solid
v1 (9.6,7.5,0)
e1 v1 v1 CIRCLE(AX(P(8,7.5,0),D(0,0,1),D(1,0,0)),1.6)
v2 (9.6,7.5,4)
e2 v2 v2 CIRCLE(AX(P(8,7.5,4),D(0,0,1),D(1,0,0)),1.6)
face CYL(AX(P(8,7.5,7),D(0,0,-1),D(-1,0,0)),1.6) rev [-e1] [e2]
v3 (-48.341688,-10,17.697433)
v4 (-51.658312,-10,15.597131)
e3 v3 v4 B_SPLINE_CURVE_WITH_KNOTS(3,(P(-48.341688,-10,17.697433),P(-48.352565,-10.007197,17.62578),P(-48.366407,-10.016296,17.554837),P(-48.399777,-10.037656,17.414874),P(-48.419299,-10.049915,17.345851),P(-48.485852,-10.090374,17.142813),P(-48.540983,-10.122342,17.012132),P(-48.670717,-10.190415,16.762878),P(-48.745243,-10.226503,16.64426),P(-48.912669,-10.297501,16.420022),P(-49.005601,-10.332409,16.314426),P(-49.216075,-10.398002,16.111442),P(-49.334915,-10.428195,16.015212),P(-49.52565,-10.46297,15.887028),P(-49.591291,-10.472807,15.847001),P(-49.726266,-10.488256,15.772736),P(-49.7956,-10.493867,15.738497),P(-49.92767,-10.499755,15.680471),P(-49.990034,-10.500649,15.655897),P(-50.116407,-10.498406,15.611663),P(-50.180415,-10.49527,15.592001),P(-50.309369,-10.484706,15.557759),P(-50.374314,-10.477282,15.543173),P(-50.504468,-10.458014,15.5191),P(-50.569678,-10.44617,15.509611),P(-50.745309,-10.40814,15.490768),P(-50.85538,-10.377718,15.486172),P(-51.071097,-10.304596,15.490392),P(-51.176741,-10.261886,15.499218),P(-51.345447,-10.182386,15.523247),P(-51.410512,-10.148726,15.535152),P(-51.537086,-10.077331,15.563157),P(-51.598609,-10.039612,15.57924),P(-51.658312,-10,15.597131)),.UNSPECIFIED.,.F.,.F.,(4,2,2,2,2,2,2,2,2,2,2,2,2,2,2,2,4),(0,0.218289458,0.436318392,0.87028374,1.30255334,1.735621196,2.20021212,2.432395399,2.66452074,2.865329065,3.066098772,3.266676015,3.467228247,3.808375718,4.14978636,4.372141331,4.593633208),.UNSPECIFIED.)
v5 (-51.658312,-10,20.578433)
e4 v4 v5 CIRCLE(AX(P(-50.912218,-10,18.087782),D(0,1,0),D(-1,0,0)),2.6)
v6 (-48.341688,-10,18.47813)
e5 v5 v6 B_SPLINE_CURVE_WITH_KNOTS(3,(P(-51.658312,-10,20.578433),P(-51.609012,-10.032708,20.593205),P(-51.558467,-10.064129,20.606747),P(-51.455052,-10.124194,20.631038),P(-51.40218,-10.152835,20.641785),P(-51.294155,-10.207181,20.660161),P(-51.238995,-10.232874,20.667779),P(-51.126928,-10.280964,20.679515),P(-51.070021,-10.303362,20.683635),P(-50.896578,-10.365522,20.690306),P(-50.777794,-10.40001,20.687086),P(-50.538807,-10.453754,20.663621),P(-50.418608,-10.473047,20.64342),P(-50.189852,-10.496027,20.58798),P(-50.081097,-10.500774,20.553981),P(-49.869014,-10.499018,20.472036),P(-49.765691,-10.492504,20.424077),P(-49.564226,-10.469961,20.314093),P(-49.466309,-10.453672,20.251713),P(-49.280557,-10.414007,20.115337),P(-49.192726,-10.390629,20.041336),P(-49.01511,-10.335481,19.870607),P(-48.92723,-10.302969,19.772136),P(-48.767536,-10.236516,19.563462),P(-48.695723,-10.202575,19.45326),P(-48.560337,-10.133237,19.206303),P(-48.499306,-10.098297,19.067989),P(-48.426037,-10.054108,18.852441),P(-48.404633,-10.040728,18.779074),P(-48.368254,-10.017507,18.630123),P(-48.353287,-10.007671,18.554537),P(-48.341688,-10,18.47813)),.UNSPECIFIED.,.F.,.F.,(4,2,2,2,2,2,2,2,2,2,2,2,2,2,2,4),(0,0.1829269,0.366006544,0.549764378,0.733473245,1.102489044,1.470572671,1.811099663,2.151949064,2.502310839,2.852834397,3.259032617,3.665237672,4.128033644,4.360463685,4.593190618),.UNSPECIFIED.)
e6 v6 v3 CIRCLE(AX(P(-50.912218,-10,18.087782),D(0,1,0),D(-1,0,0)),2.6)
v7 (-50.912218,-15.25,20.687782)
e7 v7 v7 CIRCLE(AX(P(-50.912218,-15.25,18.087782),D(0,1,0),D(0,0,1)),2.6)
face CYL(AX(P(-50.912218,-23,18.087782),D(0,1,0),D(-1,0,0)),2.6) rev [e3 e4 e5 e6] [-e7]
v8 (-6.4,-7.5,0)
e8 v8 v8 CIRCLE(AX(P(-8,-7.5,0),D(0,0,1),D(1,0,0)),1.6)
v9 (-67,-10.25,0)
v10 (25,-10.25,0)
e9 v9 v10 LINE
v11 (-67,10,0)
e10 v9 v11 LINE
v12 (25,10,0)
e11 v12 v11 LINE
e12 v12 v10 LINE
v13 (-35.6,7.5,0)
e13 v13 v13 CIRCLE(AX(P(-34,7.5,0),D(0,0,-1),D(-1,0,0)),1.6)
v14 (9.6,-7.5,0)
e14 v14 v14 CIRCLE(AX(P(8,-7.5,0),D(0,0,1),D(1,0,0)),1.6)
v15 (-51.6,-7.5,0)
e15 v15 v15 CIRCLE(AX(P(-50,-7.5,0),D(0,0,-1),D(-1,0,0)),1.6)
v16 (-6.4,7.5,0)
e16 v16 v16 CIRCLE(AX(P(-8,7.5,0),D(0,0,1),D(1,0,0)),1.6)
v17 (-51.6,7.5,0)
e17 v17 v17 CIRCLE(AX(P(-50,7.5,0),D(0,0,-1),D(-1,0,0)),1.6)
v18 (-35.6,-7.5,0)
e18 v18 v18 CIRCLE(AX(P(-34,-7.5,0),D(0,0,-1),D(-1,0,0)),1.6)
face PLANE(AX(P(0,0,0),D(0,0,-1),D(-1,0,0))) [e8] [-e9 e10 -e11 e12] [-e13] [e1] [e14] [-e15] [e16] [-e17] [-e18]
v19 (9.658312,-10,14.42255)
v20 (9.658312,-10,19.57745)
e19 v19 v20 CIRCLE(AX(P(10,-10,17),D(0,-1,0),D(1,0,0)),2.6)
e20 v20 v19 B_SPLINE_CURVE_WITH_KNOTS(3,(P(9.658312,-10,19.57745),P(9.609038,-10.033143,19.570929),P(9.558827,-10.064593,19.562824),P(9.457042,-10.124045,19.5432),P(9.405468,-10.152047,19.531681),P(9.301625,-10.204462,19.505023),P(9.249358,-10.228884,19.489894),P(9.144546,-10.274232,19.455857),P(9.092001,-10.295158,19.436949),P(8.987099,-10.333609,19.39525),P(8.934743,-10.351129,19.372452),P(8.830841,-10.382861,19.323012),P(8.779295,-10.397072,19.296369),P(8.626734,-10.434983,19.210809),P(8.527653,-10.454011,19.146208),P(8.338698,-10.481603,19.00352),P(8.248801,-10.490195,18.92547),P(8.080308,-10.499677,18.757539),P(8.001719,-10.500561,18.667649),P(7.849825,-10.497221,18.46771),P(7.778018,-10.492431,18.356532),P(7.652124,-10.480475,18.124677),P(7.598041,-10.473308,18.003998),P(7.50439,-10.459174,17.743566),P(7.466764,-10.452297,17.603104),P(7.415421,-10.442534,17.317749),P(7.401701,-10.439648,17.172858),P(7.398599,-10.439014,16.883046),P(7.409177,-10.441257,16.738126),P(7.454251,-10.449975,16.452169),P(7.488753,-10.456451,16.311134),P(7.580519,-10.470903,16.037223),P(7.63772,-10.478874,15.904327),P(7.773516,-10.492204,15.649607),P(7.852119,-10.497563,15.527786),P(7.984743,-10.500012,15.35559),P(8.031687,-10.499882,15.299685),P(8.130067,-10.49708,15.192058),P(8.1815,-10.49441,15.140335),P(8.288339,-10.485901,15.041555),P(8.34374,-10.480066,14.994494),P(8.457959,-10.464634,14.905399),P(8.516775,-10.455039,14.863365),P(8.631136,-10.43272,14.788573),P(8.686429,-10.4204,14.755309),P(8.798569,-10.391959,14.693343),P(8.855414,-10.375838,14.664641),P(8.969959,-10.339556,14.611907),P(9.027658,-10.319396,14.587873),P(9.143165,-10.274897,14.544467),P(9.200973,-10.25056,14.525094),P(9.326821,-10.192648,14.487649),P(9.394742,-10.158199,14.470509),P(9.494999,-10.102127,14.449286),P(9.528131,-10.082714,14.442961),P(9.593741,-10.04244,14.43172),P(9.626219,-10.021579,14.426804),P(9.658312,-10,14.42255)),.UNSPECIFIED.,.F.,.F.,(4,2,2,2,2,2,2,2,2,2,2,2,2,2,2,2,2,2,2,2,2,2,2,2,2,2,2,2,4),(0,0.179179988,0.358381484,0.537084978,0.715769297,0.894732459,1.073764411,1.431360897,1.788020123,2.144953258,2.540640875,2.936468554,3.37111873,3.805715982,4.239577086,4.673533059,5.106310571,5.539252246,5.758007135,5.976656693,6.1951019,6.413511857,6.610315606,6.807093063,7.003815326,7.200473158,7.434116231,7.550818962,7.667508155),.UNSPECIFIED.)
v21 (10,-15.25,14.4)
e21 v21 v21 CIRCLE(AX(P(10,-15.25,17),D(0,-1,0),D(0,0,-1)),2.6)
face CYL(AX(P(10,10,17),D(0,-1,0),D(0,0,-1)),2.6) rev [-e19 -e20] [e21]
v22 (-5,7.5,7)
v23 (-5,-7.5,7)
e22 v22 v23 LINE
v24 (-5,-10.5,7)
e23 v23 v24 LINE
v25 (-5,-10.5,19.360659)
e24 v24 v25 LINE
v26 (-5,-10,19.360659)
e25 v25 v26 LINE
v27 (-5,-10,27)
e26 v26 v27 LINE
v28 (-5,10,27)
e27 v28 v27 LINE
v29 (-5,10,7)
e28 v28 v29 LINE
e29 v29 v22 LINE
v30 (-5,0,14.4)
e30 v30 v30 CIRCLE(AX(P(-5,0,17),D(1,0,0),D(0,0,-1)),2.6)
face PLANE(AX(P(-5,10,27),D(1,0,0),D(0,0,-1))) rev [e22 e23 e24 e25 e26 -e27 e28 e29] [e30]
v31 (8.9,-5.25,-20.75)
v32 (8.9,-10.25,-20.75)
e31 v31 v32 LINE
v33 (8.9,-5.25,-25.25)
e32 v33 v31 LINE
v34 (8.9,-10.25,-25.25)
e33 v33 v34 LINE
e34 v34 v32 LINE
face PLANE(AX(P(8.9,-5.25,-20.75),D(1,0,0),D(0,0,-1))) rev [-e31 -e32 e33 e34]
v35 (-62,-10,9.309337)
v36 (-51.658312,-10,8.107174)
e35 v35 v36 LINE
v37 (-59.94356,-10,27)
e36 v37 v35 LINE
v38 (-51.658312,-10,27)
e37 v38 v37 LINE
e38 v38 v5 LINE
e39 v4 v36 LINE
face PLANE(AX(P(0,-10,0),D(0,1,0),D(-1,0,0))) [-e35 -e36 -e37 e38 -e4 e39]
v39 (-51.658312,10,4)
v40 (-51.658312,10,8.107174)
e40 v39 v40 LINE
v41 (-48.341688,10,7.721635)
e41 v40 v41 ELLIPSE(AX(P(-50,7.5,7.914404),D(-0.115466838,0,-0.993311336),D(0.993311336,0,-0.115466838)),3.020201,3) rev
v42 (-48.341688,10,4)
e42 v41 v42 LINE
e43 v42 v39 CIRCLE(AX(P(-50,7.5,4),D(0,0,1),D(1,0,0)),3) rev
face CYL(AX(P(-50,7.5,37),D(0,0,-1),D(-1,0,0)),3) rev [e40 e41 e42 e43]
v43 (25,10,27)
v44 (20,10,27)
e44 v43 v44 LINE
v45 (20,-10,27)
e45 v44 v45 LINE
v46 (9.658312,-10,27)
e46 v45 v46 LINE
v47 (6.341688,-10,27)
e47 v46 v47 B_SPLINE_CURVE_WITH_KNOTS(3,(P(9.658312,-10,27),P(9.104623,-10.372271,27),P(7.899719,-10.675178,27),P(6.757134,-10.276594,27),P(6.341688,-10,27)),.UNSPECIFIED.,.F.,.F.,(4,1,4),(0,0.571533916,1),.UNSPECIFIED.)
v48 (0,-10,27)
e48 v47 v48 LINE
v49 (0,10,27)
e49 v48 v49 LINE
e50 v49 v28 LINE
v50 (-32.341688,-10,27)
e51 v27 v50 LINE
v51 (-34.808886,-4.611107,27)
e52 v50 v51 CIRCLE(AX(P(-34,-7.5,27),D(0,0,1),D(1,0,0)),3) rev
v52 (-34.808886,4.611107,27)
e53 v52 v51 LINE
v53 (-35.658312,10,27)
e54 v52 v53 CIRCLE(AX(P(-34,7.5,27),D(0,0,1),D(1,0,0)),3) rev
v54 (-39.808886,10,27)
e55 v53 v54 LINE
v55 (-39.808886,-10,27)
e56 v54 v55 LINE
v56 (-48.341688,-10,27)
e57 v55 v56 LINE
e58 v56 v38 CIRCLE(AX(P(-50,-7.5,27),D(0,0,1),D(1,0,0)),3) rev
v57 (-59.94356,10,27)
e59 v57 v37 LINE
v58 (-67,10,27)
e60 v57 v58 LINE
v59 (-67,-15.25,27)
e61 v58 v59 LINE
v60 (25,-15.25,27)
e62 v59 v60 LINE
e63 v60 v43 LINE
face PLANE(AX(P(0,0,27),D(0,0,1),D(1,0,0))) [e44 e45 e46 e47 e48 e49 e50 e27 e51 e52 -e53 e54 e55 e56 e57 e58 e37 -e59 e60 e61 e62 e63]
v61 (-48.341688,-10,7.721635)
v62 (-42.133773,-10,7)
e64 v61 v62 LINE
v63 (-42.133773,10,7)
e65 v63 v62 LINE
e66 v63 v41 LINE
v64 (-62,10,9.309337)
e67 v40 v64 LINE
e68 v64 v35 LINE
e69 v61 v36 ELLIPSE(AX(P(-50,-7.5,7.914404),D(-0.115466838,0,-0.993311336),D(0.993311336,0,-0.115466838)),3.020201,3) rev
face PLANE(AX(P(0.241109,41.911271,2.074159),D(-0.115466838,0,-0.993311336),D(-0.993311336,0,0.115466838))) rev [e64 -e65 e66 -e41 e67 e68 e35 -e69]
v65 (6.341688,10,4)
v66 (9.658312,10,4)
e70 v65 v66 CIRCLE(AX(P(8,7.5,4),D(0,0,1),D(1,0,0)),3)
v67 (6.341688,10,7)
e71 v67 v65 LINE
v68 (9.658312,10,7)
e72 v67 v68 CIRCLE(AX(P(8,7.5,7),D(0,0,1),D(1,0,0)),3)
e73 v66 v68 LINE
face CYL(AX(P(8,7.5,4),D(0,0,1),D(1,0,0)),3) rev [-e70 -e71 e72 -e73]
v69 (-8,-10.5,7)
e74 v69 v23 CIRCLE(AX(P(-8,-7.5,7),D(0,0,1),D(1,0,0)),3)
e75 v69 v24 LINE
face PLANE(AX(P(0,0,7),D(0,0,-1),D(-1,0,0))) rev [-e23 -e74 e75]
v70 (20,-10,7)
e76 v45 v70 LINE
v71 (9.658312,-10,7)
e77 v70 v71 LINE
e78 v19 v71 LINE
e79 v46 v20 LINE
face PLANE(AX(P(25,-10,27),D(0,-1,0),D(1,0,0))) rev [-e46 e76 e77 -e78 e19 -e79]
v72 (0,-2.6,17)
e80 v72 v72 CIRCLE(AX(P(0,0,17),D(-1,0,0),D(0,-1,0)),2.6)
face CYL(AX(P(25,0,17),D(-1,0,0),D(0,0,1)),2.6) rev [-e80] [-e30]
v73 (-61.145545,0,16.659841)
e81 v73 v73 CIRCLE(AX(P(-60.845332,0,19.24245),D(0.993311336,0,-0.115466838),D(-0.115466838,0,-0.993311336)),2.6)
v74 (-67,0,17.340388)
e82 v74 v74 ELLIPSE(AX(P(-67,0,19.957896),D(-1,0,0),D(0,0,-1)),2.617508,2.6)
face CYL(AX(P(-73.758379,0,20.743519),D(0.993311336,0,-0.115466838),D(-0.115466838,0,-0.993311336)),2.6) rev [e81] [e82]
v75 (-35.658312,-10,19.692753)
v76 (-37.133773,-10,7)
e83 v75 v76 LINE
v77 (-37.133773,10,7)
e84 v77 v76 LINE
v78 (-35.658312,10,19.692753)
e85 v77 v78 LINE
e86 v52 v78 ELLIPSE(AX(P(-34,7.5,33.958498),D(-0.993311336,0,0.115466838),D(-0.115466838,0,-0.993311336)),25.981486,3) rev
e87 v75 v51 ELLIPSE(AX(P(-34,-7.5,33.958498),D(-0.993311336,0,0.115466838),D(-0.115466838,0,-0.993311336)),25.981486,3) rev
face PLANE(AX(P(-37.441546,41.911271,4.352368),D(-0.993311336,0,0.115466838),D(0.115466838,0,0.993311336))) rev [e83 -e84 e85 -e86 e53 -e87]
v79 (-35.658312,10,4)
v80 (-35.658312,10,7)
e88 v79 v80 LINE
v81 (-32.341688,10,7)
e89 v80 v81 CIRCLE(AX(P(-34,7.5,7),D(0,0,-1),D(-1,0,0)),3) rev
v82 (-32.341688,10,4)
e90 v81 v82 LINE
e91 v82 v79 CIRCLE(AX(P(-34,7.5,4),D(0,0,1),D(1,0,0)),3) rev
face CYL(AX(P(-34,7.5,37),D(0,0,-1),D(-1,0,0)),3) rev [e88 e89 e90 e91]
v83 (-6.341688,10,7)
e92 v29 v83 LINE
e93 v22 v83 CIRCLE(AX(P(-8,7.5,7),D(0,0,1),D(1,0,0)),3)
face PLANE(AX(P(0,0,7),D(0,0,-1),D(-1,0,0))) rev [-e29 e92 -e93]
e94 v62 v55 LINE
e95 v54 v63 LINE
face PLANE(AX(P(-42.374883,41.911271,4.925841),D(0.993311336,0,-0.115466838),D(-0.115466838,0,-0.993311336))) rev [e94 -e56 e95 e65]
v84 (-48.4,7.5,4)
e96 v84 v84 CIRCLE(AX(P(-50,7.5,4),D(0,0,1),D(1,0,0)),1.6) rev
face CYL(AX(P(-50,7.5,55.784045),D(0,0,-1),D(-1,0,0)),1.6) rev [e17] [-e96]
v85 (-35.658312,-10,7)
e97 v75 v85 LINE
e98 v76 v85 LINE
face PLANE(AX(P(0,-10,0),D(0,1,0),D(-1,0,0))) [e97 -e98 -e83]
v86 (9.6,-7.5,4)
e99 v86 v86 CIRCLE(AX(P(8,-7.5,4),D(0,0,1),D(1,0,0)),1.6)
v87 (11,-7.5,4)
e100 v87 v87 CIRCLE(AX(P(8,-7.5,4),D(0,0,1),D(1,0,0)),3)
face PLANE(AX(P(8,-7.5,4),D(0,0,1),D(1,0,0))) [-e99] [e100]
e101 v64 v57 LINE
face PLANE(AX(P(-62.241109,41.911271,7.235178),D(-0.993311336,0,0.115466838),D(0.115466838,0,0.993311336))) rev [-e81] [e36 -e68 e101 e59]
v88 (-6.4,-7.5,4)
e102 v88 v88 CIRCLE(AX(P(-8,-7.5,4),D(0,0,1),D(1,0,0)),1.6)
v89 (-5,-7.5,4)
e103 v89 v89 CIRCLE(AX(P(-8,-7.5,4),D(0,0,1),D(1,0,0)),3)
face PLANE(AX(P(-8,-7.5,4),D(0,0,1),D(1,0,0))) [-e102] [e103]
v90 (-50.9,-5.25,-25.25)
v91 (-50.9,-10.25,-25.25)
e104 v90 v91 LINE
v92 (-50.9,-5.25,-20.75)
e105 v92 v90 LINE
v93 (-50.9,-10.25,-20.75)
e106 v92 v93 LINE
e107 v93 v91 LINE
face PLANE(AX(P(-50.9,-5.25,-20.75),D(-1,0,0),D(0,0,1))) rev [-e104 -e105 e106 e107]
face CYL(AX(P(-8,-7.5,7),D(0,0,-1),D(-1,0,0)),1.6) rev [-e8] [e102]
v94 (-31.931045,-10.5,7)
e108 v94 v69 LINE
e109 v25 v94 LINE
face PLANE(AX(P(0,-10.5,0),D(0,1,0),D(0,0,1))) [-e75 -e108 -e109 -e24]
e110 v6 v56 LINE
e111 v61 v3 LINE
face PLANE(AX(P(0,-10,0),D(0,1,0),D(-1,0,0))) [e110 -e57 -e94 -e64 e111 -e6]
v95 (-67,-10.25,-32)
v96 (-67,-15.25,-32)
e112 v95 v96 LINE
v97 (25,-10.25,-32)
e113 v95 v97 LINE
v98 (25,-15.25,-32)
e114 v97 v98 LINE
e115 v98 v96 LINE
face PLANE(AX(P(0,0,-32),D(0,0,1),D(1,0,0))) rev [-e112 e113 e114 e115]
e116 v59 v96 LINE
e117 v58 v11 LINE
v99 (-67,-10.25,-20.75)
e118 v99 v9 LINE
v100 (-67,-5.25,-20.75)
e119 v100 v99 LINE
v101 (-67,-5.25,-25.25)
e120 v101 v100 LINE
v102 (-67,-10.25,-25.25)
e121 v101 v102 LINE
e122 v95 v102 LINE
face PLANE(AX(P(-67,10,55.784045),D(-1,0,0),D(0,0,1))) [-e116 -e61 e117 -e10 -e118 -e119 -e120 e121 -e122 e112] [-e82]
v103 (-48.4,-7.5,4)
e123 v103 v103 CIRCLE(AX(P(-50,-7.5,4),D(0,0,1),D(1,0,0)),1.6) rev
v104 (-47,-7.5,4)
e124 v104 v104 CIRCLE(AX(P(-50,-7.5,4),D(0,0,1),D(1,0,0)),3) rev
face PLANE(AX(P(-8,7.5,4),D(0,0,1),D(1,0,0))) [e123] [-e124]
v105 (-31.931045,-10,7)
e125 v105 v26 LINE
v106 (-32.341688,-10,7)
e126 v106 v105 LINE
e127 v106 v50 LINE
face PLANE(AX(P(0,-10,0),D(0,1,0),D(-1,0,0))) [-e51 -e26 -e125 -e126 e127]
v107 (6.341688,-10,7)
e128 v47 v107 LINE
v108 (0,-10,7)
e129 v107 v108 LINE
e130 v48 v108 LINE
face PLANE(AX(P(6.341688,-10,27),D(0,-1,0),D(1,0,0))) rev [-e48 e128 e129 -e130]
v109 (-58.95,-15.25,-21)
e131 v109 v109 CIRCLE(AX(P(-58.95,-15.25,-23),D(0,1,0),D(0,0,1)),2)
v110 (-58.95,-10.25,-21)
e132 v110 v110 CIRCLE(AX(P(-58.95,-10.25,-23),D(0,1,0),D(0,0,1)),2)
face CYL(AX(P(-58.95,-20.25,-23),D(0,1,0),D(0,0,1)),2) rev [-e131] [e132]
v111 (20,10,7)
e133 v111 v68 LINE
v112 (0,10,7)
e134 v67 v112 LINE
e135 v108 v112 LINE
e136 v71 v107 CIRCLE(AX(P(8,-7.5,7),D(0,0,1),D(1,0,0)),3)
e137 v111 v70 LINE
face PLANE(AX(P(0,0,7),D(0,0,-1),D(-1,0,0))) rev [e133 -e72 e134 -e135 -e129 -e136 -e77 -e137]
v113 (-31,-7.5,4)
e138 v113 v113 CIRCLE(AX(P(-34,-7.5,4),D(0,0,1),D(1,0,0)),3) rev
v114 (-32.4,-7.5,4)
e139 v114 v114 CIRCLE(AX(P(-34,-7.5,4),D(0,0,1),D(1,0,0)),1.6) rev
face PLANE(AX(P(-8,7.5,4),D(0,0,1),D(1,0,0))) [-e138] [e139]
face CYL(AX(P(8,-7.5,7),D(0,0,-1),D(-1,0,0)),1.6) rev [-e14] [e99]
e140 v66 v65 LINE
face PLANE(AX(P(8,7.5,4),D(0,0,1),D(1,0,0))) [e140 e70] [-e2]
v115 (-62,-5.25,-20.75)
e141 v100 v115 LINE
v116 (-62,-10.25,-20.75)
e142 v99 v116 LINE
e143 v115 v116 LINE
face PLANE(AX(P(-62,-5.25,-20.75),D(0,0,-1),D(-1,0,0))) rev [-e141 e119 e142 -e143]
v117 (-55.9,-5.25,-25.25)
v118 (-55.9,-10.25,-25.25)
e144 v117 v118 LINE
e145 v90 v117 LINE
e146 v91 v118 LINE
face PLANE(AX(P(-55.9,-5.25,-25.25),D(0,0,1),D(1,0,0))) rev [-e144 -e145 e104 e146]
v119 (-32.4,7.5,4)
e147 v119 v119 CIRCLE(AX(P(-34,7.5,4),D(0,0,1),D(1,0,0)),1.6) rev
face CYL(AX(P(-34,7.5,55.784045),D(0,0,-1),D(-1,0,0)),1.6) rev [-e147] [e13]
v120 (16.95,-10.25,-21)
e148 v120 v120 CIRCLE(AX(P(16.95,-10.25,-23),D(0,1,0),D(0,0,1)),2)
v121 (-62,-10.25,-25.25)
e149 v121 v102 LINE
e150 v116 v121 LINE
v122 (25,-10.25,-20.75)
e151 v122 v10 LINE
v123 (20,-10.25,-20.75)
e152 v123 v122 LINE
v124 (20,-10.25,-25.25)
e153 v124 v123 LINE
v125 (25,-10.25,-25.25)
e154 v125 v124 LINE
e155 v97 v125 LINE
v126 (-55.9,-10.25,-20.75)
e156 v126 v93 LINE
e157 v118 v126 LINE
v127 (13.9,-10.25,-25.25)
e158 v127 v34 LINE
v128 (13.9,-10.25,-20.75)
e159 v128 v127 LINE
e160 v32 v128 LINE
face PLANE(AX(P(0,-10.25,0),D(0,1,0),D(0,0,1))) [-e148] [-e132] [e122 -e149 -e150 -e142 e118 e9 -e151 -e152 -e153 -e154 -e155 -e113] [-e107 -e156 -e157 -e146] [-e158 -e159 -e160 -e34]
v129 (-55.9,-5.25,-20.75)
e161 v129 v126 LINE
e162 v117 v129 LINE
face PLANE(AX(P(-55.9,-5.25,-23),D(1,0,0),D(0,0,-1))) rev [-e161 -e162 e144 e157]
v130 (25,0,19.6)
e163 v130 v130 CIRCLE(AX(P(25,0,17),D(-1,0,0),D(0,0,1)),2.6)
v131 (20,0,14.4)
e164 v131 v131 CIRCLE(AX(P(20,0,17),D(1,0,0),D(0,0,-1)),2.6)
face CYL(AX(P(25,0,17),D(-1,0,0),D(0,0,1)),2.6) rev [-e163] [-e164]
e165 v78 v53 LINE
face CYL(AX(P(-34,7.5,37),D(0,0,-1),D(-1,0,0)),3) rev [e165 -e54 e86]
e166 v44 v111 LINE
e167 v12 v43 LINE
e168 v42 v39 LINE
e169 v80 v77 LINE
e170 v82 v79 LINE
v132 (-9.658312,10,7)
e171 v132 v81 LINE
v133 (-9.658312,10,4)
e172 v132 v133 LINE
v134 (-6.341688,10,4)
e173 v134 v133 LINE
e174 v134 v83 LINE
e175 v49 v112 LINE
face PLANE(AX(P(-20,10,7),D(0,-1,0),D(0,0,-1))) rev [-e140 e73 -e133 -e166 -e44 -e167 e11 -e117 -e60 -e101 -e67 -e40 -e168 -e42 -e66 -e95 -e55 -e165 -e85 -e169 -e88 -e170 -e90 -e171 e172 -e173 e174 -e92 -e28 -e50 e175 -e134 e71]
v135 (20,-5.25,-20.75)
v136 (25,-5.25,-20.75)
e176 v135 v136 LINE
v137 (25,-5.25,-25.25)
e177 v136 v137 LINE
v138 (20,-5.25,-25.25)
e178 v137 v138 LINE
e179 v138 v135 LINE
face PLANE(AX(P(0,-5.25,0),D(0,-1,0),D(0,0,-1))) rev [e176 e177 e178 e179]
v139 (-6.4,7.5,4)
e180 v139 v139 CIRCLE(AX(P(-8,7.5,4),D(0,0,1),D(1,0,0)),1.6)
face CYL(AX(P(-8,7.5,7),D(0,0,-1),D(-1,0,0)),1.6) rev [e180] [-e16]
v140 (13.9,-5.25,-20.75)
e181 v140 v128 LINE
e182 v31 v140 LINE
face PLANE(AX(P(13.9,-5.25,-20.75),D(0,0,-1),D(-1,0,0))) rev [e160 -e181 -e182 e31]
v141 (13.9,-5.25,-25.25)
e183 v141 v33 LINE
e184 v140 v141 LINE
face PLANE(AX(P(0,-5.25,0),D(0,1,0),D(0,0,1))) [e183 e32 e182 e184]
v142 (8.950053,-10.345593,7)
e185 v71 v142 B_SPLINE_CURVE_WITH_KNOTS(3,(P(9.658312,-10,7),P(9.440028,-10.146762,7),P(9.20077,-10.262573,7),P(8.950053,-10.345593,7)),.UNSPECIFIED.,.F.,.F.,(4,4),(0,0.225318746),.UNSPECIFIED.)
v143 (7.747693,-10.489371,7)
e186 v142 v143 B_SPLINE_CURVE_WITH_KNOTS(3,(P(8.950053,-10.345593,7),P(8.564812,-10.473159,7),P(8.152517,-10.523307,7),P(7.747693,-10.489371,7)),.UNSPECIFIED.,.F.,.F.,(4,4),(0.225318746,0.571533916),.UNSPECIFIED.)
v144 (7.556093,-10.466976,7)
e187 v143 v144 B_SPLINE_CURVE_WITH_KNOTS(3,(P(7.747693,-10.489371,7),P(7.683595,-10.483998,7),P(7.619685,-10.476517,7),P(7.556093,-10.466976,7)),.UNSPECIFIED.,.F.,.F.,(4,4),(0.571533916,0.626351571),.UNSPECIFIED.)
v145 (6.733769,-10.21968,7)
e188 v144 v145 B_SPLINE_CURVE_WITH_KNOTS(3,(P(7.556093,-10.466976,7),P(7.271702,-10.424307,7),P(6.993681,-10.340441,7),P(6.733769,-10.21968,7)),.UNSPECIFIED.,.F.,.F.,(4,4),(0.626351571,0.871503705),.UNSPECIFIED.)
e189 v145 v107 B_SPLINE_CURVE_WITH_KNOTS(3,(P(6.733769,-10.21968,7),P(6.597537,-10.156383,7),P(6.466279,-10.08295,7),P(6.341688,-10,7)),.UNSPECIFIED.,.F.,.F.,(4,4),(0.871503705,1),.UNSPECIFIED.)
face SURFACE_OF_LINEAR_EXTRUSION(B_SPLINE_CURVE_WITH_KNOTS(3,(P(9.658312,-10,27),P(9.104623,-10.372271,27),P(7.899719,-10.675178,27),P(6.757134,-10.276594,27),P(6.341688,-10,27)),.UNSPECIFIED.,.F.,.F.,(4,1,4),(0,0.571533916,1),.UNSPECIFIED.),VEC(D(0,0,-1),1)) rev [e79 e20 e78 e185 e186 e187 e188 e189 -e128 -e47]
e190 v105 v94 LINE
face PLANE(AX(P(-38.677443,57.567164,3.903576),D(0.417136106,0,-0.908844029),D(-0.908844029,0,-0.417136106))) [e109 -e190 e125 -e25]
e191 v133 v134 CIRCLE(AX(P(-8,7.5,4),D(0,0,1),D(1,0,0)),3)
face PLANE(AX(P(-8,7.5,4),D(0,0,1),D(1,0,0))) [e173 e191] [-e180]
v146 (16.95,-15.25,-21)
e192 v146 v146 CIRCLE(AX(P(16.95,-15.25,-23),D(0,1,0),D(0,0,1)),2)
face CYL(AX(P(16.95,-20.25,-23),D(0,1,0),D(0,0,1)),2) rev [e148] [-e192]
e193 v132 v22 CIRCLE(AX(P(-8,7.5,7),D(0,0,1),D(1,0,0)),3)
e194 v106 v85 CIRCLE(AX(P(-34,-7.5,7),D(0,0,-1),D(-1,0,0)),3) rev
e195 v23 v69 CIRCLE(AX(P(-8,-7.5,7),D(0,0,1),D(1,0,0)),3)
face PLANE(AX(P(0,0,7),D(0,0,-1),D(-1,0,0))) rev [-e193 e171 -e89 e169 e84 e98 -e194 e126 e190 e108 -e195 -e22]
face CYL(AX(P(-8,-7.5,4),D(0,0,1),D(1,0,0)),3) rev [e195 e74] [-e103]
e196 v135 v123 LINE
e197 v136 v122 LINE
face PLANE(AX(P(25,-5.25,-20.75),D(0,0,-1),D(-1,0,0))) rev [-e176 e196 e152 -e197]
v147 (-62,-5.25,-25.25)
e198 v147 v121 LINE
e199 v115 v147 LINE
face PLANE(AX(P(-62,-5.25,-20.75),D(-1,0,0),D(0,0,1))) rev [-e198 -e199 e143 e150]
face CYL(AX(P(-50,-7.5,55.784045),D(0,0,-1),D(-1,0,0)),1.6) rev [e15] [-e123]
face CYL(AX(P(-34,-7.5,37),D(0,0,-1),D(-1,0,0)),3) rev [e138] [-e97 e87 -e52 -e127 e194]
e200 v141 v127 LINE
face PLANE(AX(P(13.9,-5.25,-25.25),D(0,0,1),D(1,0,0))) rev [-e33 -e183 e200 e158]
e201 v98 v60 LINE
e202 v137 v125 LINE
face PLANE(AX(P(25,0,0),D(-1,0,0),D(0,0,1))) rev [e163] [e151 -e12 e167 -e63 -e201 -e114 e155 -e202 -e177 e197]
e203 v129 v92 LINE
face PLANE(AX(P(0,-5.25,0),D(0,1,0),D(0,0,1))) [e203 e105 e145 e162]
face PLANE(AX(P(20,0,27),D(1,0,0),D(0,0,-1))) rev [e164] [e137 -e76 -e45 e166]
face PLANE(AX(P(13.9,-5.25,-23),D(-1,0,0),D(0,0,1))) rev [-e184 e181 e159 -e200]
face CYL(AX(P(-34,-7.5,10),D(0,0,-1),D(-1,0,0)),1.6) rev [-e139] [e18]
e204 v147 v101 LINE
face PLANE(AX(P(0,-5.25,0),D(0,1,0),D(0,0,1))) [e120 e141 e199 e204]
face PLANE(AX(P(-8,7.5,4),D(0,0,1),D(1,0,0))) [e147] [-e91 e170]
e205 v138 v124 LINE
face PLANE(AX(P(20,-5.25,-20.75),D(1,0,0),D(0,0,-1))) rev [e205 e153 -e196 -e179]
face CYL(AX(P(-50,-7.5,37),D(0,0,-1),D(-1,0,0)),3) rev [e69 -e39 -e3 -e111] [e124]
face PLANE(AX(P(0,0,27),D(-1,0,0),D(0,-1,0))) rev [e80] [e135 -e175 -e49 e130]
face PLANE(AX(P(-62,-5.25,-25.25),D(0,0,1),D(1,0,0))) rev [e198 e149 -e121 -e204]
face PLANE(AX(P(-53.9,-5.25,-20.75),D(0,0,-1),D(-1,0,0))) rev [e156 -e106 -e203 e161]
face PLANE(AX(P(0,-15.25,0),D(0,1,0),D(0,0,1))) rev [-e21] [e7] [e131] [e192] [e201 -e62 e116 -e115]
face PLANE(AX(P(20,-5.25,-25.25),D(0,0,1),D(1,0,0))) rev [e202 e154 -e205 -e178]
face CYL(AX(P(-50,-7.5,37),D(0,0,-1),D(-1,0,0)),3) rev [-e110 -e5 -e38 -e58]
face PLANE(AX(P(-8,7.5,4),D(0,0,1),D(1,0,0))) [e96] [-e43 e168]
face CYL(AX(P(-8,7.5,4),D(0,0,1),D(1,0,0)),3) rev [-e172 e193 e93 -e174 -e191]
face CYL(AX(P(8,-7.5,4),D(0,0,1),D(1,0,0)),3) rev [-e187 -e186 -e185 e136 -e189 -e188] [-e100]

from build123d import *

# Parameters (mm, degrees)
SKETCH1_W                       = 40
SKETCH1_H                       = 20
SKETCH1_R                       = 1.6
BOSS_EXTRUDE1_DEPTH             = 7
BOSS_EXTRUDE2_DEPTH             = 5
BOSS_EXTRUDE3_DEPTH             = 5
BOSS_EXTRUDE4_DEPTH             = 0.25
SKETCH5_W                       = 50
SKETCH5_H                       = 36
BOSS_EXTRUDE5_DEPTH             = 5
SKETCH6_R                       = 3
CUT_EXTRUDE1_DEPTH              = 3
BOSS_EXTRUDE6_DEPTH             = 20
BOSS_EXTRUDE8_DEPTH             = 20
SKETCH10_R                      = 2.6
CUT_EXTRUDE2_DEPTH              = 60.779281528
BOSS_EXTRUDE9_DEPTH             = 20
SKETCH12_R                      = 2.6
CUT_EXTRUDE3_DEPTH              = 60.190898836
SKETCH13_W                      = 5
SKETCH13_H                      = 5
CUT_EXTRUDE4_DEPTH              = 6.5
CHAMFER1_SIZE                   = 15.398649638
CHAMFER1_SIZE_2                 = 10
SKETCH14_W                      = 1
SKETCH14_H                      = 20.25
CUT_EXTRUDE5_DEPTH              = 10
SKETCH16_W                      = 4
SKETCH16_H                      = 20.25
CUT_EXTRUDE7_DEPTH              = 10
BOSS_EXTRUDE10_DEPTH            = 4.75
SKETCH18_W                      = 70
SKETCH18_H                      = 5
BOSS_EXTRUDE11_DEPTH            = 3
SKETCH19_W                      = 27.635095591
SKETCH19_H                      = 22.859442667
CUT_EXTRUDE8_DEPTH              = 10
SKETCH20_R                      = 1.6
BOSS_EXTRUDE12_DEPTH            = 7
SKETCH21_R                      = 1.6
CUT_EXTRUDE9_DEPTH              = 10
BOSS_EXTRUDE13_DEPTH            = 20
BOSS_EXTRUDE16_DEPTH            = 5.25
CUT_EXTRUDE10_REACH             = 81.01
SKETCH24_R                      = 3
CUT_EXTRUDE10_DIRECTION_2_DEPTH = 30
SKETCH25_R                      = 2.6
CUT_EXTRUDE11_DEPTH             = 13
SKETCH26_R                      = 2.6
CUT_EXTRUDE12_DEPTH             = 13
SKETCH27_W                      = 22
SKETCH27_H                      = 5
BOSS_EXTRUDE17_DEPTH            = 32
BOSS_EXTRUDE7_DEPTH             = 5
SKETCH15_R                      = 2
CUT_EXTRUDE6_DEPTH              = 10


with BuildPart() as part:
    # Sketch1 → Boss-Extrude1 (new body)
    with BuildSketch(Plane.XY):
        Rectangle(SKETCH1_W, SKETCH1_H)
        with Locations((-8, 7.5)):
            Circle(SKETCH1_R, mode=Mode.SUBTRACT)
        with Locations((8, 7.5)):
            Circle(SKETCH1_R, mode=Mode.SUBTRACT)
        with Locations((8, -7.5)):
            Circle(SKETCH1_R, mode=Mode.SUBTRACT)
        with Locations((-8, -7.5)):
            Circle(SKETCH1_R, mode=Mode.SUBTRACT)
    extrude(amount=BOSS_EXTRUDE1_DEPTH)

    # Sketch2 → Boss-Extrude2 (add)
    with BuildSketch(Plane(origin=(20, 0, 0), x_dir=(0, 0, -1), z_dir=(1, 0, 0))):
        Polygon((3, -5), (3, 5), (9.5, 5), (9.5, 10), (0, 10), (-7, 10), (-7, -10), (0, -10), (9.5, -10), (9.5, -5), align=None)
    extrude(amount=BOSS_EXTRUDE2_DEPTH)

    # Sketch3 → Boss-Extrude3 (add)
    with BuildSketch(Plane.ZY.offset(20)):
        Polygon((7, 10), (-9.5, 10), (-9.5, 5), (-3, 5), (-3, -5), (-9.5, -5), (-9.5, -10), (7, -10), align=None)
    extrude(amount=BOSS_EXTRUDE3_DEPTH)

    # Sketch4 → Boss-Extrude4 (add)
    with BuildSketch(Plane.XZ.offset(10)):
        Polygon((-25, 7), (-25, -9.5), (-20, -9.5), (-20, 0), (20, 0), (20, -9.5), (25, -9.5), (25, 7), align=None)
    extrude(amount=BOSS_EXTRUDE4_DEPTH)

    # Sketch5 → Boss-Extrude5 (add)
    with BuildSketch(Plane.XZ.offset(10.25)):
        with Locations((0, -11)):
            Rectangle(SKETCH5_W, SKETCH5_H)
    extrude(amount=BOSS_EXTRUDE5_DEPTH)

    # Sketch6 → Cut-Extrude1 (cut)
    with BuildSketch(Plane.XY.offset(7)):
        with Locations((-8, 7.5)):
            Circle(SKETCH6_R)
        with Locations((-8, -7.5)):
            Circle(SKETCH6_R)
        with Locations((8, -7.5)):
            Circle(SKETCH6_R)
        with Locations((8, 7.5)):
            Circle(SKETCH6_R)
    extrude(amount=-CUT_EXTRUDE1_DEPTH, mode=Mode.SUBTRACT)

    # Sketch7 → Boss-Extrude6 (add)
    with BuildSketch(Plane.ZY.offset(25)):
        Polygon((-3, -5), (7, -5), (7, -15.25), (-29, -15.25), (-29, -10.25), (-9.5, -10.25), (-9.5, -5), align=None)
    extrude(amount=BOSS_EXTRUDE6_DEPTH)

    # Sketch9 → Boss-Extrude8 (add)
    with BuildSketch(Plane.XY.offset(7)):
        Polygon((0, 0), (0, 10), (-5, 10), (-5, -10), (0, -10), align=None)
        Polygon((20, 0), (20, 10), (25, 10), (25, -10), (20, -10), align=None)
    extrude(amount=BOSS_EXTRUDE8_DEPTH)

    # Sketch10 → Cut-Extrude2 (cut, through all)
    with BuildSketch(Plane.ZY.offset(25)):
        with Locations(Location((17, 0, 0), (0, 0, 270))):
            Circle(SKETCH10_R)
    extrude(amount=-CUT_EXTRUDE2_DEPTH, mode=Mode.SUBTRACT)

    # Sketch11 → Boss-Extrude9 (add, through all)
    with BuildSketch(Plane.XY.offset(7)):
        with BuildLine():
            Line((25, -15.25), (25, -10))
            Line((25, -10), (10, -10))
            Line((10, -10), (9.658312395, -10))
            add(Edge.make_bspline(
                [(9.658312395, -10), (9.104622692, -10.372271133), (7.89971927, -10.67517784), (6.757134286, -10.276593696), (6.341687605, -10)],
                knots=[0, 0, 0, 0, 0.571533916, 1, 1, 1, 1], degree=3))
            Line((6.341687605, -10), (-5, -10))
            Line((-5, -10), (-5, -15.25))
            Line((-5, -15.25), (25, -15.25))
        make_face()
    extrude(amount=BOSS_EXTRUDE9_DEPTH)

    # Sketch12 → Cut-Extrude3 (cut, through all)
    with BuildSketch(Plane.XZ.offset(15.25)):
        with Locations(Location((10, 17, 0), (0, 0, 270))):
            Circle(SKETCH12_R)
    extrude(amount=-CUT_EXTRUDE3_DEPTH, mode=Mode.SUBTRACT)

    # Sketch13 → Cut-Extrude4 (cut)
    with BuildSketch(Plane(origin=(0, 0, -9.5), x_dir=(-1, 0, 0), z_dir=(0, 0, -1))):
        with Locations((22.5, 7.5)):
            Rectangle(SKETCH13_W, SKETCH13_H)
        with Locations((-22.5, 7.5)):
            Rectangle(SKETCH13_W, SKETCH13_H)
    extrude(amount=-CUT_EXTRUDE4_DEPTH, mode=Mode.SUBTRACT)

    # Chamfer1
    # the kernel refuses this chamfer: 15.398649638, 10 mm, written as the material it adds along each edge
    with BuildSketch(Plane(origin=(-25, -5, 7), x_dir=(0.021073765466273167, 0.9997779235455604, 0), z_dir=(0, 0, -1))) as chamfer1_piece_1_section:
        Polygon((CHAMFER1_SIZE * 0.999777923555, -CHAMFER1_SIZE * 0.0210737654665), (-CHAMFER1_SIZE_2 * 0.0210737654663, -CHAMFER1_SIZE_2 * 0.999777923546), (0, 0), align=None)
    chamfer1_piece_1 = extrude(amount=10, mode=Mode.PRIVATE)
    chamfer1_piece_1 = split(chamfer1_piece_1, bisect_by=Plane(origin=(-28.252881362, 10, 2), z_dir=(0, -1, 0)), keep=Keep.TOP, mode=Mode.PRIVATE)
    add(chamfer1_piece_1)

    # Sketch14 → Cut-Extrude5 (cut)
    with BuildSketch(Plane(origin=(0, 0, 0), x_dir=(-1, 0, 0), z_dir=(0, 0, -1))):
        with Locations((20.5, -0.125)):
            Rectangle(SKETCH14_W, SKETCH14_H)
        with Locations((-20.5, -0.125)):
            Rectangle(SKETCH14_W, SKETCH14_H)
    extrude(amount=CUT_EXTRUDE5_DEPTH, mode=Mode.SUBTRACT)

    # Sketch16 → Cut-Extrude7 (cut)
    with BuildSketch(Plane(origin=(0, 0, 0), x_dir=(-1, 0, 0), z_dir=(0, 0, -1))):
        with Locations((-23, -0.125)):
            Rectangle(SKETCH16_W, SKETCH16_H)
    extrude(amount=CUT_EXTRUDE7_DEPTH, mode=Mode.SUBTRACT)

    # Sketch17 → Boss-Extrude10 (add)
    with BuildSketch(Plane.XZ.offset(15.25)):
        Polygon((-5, 27), (-45, 7), (-5, 7), align=None)
    extrude(amount=-BOSS_EXTRUDE10_DEPTH)

    # Sketch18 → Boss-Extrude11 (add)
    with BuildSketch(Plane(origin=(0, 0, -29), x_dir=(-1, 0, 0), z_dir=(0, 0, -1))):
        with Locations((10, -12.75)):
            Rectangle(SKETCH18_W, SKETCH18_H)
    extrude(amount=BOSS_EXTRUDE11_DEPTH)

    # Sketch19 → Cut-Extrude8 (cut)
    with BuildSketch(Plane(origin=(0, 0, 0), x_dir=(-1, 0, 0), z_dir=(0, 0, -1))):
        with Locations((34.817547796, 1.179721334)):
            Rectangle(SKETCH19_W, SKETCH19_H)
    extrude(amount=CUT_EXTRUDE8_DEPTH, mode=Mode.SUBTRACT)

    # Sketch20 → Boss-Extrude12 (add)
    with BuildSketch(Plane(origin=(0, 0, 0), x_dir=(-1, 0, 0), z_dir=(0, 0, -1))):
        Polygon((25.258886102, 10), (67, 10), (67, -15.25), (45, -15.25), (25.258886102, -15.25), align=None)
        with Locations((34, 7.5)):
            Circle(SKETCH20_R, mode=Mode.SUBTRACT)
        with Locations((50, 7.5)):
            Circle(SKETCH20_R, mode=Mode.SUBTRACT)
        with Locations((50, -7.5)):
            Circle(SKETCH20_R, mode=Mode.SUBTRACT)
        with Locations((34, -7.5)):
            Circle(SKETCH20_R, mode=Mode.SUBTRACT)
    extrude(amount=-BOSS_EXTRUDE12_DEPTH)

    # Sketch21 → Cut-Extrude9 (cut)
    with BuildSketch(Plane(origin=(0, 0, 0), x_dir=(-1, 0, 0), z_dir=(0, 0, -1))):
        with Locations((34, -7.5)):
            Circle(SKETCH21_R)
    extrude(amount=-CUT_EXTRUDE9_DEPTH, mode=Mode.SUBTRACT)

    # Sketch22 → Boss-Extrude13 (add)
    with BuildSketch(Plane(origin=(0, -10, 0), x_dir=(1, 0, 0), z_dir=(0, 1, 0))):
        Polygon((-34.808886143, -27), (-37.133773289, -7), (-42.133773289, -7), (-39.808886143, -27), align=None)
        Polygon((-62, -27), (-59.943560221, -27), (-62, -9.309336755), (-42.133773289, -7), (-62, -7), (-67, -7), (-67, -27), align=None)
    extrude(amount=BOSS_EXTRUDE13_DEPTH)

    # Sketch23 → Boss-Extrude16 (add)
    with BuildSketch(Plane.XZ.offset(15.25)):
        Polygon((-5, 27), (-67, 27), (-67, 7), (-38.677443382, 3.903576174), (-3.502938693, 20.047771916), align=None)
    extrude(amount=-BOSS_EXTRUDE16_DEPTH)

    # Cut-Extrude10: up to this face of the body (flat: up to its plane)
    cut_extrude10_end = Plane(part.part.faces().sort_by_distance((-8, 9.918605897, 4))[0])
    # Sketch24 → Cut-Extrude10 (cut, up to the picked face)
    with BuildSketch(Plane.XY.offset(7), mode=Mode.PRIVATE) as cut_extrude10_sk1:
        with Locations((-34, 7.5)):
            Circle(SKETCH24_R)
    cut_extrude10_tool1 = split(extrude(cut_extrude10_sk1.sketch, amount=-CUT_EXTRUDE10_REACH, mode=Mode.PRIVATE), bisect_by=cut_extrude10_end, keep=Keep.BOTH, mode=Mode.PRIVATE)
    # Sketch24 → Cut-Extrude10 (cut, up to the picked face)
    with BuildSketch(Plane.XY.offset(7), mode=Mode.PRIVATE) as cut_extrude10_sk2:
        with Locations((-50, 7.5)):
            Circle(SKETCH24_R)
    cut_extrude10_tool2 = split(extrude(cut_extrude10_sk2.sketch, amount=-CUT_EXTRUDE10_REACH, mode=Mode.PRIVATE), bisect_by=cut_extrude10_end, keep=Keep.BOTH, mode=Mode.PRIVATE)
    # Sketch24 → Cut-Extrude10 (cut, up to the picked face)
    with BuildSketch(Plane.XY.offset(7), mode=Mode.PRIVATE) as cut_extrude10_sk3:
        with Locations(Location((-50, -7.5, 0), (0, 0, 236.442690238))):
            Circle(SKETCH24_R)
    cut_extrude10_tool3 = split(extrude(cut_extrude10_sk3.sketch, amount=-CUT_EXTRUDE10_REACH, mode=Mode.PRIVATE), bisect_by=cut_extrude10_end, keep=Keep.BOTH, mode=Mode.PRIVATE)
    # Sketch24 → Cut-Extrude10 (cut, up to the picked face)
    with BuildSketch(Plane.XY.offset(7), mode=Mode.PRIVATE) as cut_extrude10_sk4:
        with Locations(Location((-34, -7.5, 0), (0, 0, 236.442690238))):
            Circle(SKETCH24_R)
    cut_extrude10_tool4 = split(extrude(cut_extrude10_sk4.sketch, amount=-CUT_EXTRUDE10_REACH, mode=Mode.PRIVATE), bisect_by=cut_extrude10_end, keep=Keep.BOTH, mode=Mode.PRIVATE)
    add(cut_extrude10_tool1.solids().sort_by(Axis((-34, 7.5, 7), (0, 0, -1)))[0], mode=Mode.SUBTRACT)
    add(cut_extrude10_tool2.solids().sort_by(Axis((-50, 7.5, 7), (0, 0, -1)))[0], mode=Mode.SUBTRACT)
    add(cut_extrude10_tool3.solids().sort_by(Axis((-50, -7.5, 7), (0, 0, -1)))[0], mode=Mode.SUBTRACT)
    add(cut_extrude10_tool4.solids().sort_by(Axis((-34, -7.5, 7), (0, 0, -1)))[0], mode=Mode.SUBTRACT)

    # Sketch24 → Cut-Extrude10 direction 2 (cut)
    with BuildSketch(Plane.XY.offset(7)):
        with Locations((-34, 7.5)):
            Circle(SKETCH24_R)
        with Locations((-50, 7.5)):
            Circle(SKETCH24_R)
        with Locations(Location((-50, -7.5, 0), (0, 0, 236.442690238))):
            Circle(SKETCH24_R)
        with Locations(Location((-34, -7.5, 0), (0, 0, 236.442690238))):
            Circle(SKETCH24_R)
    extrude(amount=CUT_EXTRUDE10_DIRECTION_2_DEPTH, mode=Mode.SUBTRACT)

    # Sketch25 → Cut-Extrude11 (cut)
    with BuildSketch(Plane(origin=(0, -10, 0), x_dir=(1, 0, 0), z_dir=(0, 1, 0))):
        with Locations(Location((-50.912218267, -18.087781733, 0), (0, 0, 253.32400016))):
            Circle(SKETCH25_R)
    extrude(amount=-CUT_EXTRUDE11_DEPTH, mode=Mode.SUBTRACT)

    # Sketch26 → Cut-Extrude12 (cut)
    with BuildSketch(Plane(origin=(-62.241109281, 0, 7.235177744), x_dir=(-0.11546683777049035, 0, -0.9933113355717247), z_dir=(0.9933113355717246, 0, -0.11546683777049034))):
        with Locations((-12.088125784, 0)):
            Circle(SKETCH26_R)
    extrude(amount=-CUT_EXTRUDE12_DEPTH, mode=Mode.SUBTRACT)

    # Sketch27 → Boss-Extrude17 (add)
    with BuildSketch(Plane(origin=(0, 0, 0), x_dir=(-1, 0, 0), z_dir=(0, 0, -1))):
        with Locations((56, -12.75)):
            Rectangle(SKETCH27_W, SKETCH27_H)
    extrude(amount=BOSS_EXTRUDE17_DEPTH)

    # Sketch8 → Boss-Extrude7 (add)
    with BuildSketch(Plane(origin=(0, -10.25, 0), x_dir=(1, 0, 0), z_dir=(0, 1, 0))):
        Polygon((20, 20.75), (20, 25.25), (25, 25.25), (25, 20.75), (22, 20.75), align=None)
        Polygon((13.9, 23), (13.9, 20.75), (11.9, 20.75), (8.9, 20.75), (8.9, 25.25), (13.9, 25.25), align=None)
        Polygon((-50.9, 20.75), (-50.9, 25.25), (-55.9, 25.25), (-55.9, 23), (-55.9, 20.75), (-53.9, 20.75), align=None)
        Polygon((-67, 20.75), (-64, 20.75), (-62, 20.75), (-62, 25.25), (-67, 25.25), align=None)
    extrude(amount=BOSS_EXTRUDE7_DEPTH)

    # Sketch15 → Cut-Extrude6 (cut)
    with BuildSketch(Plane(origin=(0, -10.25, 0), x_dir=(1, 0, 0), z_dir=(0, 1, 0))):
        with Locations(Location((16.95, 23, 0), (0, 0, 270))):
            Circle(SKETCH15_R)
        with Locations(Location((-58.95, 23, 0), (0, 0, 270))):
            Circle(SKETCH15_R)
    extrude(amount=-CUT_EXTRUDE6_DEPTH, mode=Mode.SUBTRACT)


solid = part.part
